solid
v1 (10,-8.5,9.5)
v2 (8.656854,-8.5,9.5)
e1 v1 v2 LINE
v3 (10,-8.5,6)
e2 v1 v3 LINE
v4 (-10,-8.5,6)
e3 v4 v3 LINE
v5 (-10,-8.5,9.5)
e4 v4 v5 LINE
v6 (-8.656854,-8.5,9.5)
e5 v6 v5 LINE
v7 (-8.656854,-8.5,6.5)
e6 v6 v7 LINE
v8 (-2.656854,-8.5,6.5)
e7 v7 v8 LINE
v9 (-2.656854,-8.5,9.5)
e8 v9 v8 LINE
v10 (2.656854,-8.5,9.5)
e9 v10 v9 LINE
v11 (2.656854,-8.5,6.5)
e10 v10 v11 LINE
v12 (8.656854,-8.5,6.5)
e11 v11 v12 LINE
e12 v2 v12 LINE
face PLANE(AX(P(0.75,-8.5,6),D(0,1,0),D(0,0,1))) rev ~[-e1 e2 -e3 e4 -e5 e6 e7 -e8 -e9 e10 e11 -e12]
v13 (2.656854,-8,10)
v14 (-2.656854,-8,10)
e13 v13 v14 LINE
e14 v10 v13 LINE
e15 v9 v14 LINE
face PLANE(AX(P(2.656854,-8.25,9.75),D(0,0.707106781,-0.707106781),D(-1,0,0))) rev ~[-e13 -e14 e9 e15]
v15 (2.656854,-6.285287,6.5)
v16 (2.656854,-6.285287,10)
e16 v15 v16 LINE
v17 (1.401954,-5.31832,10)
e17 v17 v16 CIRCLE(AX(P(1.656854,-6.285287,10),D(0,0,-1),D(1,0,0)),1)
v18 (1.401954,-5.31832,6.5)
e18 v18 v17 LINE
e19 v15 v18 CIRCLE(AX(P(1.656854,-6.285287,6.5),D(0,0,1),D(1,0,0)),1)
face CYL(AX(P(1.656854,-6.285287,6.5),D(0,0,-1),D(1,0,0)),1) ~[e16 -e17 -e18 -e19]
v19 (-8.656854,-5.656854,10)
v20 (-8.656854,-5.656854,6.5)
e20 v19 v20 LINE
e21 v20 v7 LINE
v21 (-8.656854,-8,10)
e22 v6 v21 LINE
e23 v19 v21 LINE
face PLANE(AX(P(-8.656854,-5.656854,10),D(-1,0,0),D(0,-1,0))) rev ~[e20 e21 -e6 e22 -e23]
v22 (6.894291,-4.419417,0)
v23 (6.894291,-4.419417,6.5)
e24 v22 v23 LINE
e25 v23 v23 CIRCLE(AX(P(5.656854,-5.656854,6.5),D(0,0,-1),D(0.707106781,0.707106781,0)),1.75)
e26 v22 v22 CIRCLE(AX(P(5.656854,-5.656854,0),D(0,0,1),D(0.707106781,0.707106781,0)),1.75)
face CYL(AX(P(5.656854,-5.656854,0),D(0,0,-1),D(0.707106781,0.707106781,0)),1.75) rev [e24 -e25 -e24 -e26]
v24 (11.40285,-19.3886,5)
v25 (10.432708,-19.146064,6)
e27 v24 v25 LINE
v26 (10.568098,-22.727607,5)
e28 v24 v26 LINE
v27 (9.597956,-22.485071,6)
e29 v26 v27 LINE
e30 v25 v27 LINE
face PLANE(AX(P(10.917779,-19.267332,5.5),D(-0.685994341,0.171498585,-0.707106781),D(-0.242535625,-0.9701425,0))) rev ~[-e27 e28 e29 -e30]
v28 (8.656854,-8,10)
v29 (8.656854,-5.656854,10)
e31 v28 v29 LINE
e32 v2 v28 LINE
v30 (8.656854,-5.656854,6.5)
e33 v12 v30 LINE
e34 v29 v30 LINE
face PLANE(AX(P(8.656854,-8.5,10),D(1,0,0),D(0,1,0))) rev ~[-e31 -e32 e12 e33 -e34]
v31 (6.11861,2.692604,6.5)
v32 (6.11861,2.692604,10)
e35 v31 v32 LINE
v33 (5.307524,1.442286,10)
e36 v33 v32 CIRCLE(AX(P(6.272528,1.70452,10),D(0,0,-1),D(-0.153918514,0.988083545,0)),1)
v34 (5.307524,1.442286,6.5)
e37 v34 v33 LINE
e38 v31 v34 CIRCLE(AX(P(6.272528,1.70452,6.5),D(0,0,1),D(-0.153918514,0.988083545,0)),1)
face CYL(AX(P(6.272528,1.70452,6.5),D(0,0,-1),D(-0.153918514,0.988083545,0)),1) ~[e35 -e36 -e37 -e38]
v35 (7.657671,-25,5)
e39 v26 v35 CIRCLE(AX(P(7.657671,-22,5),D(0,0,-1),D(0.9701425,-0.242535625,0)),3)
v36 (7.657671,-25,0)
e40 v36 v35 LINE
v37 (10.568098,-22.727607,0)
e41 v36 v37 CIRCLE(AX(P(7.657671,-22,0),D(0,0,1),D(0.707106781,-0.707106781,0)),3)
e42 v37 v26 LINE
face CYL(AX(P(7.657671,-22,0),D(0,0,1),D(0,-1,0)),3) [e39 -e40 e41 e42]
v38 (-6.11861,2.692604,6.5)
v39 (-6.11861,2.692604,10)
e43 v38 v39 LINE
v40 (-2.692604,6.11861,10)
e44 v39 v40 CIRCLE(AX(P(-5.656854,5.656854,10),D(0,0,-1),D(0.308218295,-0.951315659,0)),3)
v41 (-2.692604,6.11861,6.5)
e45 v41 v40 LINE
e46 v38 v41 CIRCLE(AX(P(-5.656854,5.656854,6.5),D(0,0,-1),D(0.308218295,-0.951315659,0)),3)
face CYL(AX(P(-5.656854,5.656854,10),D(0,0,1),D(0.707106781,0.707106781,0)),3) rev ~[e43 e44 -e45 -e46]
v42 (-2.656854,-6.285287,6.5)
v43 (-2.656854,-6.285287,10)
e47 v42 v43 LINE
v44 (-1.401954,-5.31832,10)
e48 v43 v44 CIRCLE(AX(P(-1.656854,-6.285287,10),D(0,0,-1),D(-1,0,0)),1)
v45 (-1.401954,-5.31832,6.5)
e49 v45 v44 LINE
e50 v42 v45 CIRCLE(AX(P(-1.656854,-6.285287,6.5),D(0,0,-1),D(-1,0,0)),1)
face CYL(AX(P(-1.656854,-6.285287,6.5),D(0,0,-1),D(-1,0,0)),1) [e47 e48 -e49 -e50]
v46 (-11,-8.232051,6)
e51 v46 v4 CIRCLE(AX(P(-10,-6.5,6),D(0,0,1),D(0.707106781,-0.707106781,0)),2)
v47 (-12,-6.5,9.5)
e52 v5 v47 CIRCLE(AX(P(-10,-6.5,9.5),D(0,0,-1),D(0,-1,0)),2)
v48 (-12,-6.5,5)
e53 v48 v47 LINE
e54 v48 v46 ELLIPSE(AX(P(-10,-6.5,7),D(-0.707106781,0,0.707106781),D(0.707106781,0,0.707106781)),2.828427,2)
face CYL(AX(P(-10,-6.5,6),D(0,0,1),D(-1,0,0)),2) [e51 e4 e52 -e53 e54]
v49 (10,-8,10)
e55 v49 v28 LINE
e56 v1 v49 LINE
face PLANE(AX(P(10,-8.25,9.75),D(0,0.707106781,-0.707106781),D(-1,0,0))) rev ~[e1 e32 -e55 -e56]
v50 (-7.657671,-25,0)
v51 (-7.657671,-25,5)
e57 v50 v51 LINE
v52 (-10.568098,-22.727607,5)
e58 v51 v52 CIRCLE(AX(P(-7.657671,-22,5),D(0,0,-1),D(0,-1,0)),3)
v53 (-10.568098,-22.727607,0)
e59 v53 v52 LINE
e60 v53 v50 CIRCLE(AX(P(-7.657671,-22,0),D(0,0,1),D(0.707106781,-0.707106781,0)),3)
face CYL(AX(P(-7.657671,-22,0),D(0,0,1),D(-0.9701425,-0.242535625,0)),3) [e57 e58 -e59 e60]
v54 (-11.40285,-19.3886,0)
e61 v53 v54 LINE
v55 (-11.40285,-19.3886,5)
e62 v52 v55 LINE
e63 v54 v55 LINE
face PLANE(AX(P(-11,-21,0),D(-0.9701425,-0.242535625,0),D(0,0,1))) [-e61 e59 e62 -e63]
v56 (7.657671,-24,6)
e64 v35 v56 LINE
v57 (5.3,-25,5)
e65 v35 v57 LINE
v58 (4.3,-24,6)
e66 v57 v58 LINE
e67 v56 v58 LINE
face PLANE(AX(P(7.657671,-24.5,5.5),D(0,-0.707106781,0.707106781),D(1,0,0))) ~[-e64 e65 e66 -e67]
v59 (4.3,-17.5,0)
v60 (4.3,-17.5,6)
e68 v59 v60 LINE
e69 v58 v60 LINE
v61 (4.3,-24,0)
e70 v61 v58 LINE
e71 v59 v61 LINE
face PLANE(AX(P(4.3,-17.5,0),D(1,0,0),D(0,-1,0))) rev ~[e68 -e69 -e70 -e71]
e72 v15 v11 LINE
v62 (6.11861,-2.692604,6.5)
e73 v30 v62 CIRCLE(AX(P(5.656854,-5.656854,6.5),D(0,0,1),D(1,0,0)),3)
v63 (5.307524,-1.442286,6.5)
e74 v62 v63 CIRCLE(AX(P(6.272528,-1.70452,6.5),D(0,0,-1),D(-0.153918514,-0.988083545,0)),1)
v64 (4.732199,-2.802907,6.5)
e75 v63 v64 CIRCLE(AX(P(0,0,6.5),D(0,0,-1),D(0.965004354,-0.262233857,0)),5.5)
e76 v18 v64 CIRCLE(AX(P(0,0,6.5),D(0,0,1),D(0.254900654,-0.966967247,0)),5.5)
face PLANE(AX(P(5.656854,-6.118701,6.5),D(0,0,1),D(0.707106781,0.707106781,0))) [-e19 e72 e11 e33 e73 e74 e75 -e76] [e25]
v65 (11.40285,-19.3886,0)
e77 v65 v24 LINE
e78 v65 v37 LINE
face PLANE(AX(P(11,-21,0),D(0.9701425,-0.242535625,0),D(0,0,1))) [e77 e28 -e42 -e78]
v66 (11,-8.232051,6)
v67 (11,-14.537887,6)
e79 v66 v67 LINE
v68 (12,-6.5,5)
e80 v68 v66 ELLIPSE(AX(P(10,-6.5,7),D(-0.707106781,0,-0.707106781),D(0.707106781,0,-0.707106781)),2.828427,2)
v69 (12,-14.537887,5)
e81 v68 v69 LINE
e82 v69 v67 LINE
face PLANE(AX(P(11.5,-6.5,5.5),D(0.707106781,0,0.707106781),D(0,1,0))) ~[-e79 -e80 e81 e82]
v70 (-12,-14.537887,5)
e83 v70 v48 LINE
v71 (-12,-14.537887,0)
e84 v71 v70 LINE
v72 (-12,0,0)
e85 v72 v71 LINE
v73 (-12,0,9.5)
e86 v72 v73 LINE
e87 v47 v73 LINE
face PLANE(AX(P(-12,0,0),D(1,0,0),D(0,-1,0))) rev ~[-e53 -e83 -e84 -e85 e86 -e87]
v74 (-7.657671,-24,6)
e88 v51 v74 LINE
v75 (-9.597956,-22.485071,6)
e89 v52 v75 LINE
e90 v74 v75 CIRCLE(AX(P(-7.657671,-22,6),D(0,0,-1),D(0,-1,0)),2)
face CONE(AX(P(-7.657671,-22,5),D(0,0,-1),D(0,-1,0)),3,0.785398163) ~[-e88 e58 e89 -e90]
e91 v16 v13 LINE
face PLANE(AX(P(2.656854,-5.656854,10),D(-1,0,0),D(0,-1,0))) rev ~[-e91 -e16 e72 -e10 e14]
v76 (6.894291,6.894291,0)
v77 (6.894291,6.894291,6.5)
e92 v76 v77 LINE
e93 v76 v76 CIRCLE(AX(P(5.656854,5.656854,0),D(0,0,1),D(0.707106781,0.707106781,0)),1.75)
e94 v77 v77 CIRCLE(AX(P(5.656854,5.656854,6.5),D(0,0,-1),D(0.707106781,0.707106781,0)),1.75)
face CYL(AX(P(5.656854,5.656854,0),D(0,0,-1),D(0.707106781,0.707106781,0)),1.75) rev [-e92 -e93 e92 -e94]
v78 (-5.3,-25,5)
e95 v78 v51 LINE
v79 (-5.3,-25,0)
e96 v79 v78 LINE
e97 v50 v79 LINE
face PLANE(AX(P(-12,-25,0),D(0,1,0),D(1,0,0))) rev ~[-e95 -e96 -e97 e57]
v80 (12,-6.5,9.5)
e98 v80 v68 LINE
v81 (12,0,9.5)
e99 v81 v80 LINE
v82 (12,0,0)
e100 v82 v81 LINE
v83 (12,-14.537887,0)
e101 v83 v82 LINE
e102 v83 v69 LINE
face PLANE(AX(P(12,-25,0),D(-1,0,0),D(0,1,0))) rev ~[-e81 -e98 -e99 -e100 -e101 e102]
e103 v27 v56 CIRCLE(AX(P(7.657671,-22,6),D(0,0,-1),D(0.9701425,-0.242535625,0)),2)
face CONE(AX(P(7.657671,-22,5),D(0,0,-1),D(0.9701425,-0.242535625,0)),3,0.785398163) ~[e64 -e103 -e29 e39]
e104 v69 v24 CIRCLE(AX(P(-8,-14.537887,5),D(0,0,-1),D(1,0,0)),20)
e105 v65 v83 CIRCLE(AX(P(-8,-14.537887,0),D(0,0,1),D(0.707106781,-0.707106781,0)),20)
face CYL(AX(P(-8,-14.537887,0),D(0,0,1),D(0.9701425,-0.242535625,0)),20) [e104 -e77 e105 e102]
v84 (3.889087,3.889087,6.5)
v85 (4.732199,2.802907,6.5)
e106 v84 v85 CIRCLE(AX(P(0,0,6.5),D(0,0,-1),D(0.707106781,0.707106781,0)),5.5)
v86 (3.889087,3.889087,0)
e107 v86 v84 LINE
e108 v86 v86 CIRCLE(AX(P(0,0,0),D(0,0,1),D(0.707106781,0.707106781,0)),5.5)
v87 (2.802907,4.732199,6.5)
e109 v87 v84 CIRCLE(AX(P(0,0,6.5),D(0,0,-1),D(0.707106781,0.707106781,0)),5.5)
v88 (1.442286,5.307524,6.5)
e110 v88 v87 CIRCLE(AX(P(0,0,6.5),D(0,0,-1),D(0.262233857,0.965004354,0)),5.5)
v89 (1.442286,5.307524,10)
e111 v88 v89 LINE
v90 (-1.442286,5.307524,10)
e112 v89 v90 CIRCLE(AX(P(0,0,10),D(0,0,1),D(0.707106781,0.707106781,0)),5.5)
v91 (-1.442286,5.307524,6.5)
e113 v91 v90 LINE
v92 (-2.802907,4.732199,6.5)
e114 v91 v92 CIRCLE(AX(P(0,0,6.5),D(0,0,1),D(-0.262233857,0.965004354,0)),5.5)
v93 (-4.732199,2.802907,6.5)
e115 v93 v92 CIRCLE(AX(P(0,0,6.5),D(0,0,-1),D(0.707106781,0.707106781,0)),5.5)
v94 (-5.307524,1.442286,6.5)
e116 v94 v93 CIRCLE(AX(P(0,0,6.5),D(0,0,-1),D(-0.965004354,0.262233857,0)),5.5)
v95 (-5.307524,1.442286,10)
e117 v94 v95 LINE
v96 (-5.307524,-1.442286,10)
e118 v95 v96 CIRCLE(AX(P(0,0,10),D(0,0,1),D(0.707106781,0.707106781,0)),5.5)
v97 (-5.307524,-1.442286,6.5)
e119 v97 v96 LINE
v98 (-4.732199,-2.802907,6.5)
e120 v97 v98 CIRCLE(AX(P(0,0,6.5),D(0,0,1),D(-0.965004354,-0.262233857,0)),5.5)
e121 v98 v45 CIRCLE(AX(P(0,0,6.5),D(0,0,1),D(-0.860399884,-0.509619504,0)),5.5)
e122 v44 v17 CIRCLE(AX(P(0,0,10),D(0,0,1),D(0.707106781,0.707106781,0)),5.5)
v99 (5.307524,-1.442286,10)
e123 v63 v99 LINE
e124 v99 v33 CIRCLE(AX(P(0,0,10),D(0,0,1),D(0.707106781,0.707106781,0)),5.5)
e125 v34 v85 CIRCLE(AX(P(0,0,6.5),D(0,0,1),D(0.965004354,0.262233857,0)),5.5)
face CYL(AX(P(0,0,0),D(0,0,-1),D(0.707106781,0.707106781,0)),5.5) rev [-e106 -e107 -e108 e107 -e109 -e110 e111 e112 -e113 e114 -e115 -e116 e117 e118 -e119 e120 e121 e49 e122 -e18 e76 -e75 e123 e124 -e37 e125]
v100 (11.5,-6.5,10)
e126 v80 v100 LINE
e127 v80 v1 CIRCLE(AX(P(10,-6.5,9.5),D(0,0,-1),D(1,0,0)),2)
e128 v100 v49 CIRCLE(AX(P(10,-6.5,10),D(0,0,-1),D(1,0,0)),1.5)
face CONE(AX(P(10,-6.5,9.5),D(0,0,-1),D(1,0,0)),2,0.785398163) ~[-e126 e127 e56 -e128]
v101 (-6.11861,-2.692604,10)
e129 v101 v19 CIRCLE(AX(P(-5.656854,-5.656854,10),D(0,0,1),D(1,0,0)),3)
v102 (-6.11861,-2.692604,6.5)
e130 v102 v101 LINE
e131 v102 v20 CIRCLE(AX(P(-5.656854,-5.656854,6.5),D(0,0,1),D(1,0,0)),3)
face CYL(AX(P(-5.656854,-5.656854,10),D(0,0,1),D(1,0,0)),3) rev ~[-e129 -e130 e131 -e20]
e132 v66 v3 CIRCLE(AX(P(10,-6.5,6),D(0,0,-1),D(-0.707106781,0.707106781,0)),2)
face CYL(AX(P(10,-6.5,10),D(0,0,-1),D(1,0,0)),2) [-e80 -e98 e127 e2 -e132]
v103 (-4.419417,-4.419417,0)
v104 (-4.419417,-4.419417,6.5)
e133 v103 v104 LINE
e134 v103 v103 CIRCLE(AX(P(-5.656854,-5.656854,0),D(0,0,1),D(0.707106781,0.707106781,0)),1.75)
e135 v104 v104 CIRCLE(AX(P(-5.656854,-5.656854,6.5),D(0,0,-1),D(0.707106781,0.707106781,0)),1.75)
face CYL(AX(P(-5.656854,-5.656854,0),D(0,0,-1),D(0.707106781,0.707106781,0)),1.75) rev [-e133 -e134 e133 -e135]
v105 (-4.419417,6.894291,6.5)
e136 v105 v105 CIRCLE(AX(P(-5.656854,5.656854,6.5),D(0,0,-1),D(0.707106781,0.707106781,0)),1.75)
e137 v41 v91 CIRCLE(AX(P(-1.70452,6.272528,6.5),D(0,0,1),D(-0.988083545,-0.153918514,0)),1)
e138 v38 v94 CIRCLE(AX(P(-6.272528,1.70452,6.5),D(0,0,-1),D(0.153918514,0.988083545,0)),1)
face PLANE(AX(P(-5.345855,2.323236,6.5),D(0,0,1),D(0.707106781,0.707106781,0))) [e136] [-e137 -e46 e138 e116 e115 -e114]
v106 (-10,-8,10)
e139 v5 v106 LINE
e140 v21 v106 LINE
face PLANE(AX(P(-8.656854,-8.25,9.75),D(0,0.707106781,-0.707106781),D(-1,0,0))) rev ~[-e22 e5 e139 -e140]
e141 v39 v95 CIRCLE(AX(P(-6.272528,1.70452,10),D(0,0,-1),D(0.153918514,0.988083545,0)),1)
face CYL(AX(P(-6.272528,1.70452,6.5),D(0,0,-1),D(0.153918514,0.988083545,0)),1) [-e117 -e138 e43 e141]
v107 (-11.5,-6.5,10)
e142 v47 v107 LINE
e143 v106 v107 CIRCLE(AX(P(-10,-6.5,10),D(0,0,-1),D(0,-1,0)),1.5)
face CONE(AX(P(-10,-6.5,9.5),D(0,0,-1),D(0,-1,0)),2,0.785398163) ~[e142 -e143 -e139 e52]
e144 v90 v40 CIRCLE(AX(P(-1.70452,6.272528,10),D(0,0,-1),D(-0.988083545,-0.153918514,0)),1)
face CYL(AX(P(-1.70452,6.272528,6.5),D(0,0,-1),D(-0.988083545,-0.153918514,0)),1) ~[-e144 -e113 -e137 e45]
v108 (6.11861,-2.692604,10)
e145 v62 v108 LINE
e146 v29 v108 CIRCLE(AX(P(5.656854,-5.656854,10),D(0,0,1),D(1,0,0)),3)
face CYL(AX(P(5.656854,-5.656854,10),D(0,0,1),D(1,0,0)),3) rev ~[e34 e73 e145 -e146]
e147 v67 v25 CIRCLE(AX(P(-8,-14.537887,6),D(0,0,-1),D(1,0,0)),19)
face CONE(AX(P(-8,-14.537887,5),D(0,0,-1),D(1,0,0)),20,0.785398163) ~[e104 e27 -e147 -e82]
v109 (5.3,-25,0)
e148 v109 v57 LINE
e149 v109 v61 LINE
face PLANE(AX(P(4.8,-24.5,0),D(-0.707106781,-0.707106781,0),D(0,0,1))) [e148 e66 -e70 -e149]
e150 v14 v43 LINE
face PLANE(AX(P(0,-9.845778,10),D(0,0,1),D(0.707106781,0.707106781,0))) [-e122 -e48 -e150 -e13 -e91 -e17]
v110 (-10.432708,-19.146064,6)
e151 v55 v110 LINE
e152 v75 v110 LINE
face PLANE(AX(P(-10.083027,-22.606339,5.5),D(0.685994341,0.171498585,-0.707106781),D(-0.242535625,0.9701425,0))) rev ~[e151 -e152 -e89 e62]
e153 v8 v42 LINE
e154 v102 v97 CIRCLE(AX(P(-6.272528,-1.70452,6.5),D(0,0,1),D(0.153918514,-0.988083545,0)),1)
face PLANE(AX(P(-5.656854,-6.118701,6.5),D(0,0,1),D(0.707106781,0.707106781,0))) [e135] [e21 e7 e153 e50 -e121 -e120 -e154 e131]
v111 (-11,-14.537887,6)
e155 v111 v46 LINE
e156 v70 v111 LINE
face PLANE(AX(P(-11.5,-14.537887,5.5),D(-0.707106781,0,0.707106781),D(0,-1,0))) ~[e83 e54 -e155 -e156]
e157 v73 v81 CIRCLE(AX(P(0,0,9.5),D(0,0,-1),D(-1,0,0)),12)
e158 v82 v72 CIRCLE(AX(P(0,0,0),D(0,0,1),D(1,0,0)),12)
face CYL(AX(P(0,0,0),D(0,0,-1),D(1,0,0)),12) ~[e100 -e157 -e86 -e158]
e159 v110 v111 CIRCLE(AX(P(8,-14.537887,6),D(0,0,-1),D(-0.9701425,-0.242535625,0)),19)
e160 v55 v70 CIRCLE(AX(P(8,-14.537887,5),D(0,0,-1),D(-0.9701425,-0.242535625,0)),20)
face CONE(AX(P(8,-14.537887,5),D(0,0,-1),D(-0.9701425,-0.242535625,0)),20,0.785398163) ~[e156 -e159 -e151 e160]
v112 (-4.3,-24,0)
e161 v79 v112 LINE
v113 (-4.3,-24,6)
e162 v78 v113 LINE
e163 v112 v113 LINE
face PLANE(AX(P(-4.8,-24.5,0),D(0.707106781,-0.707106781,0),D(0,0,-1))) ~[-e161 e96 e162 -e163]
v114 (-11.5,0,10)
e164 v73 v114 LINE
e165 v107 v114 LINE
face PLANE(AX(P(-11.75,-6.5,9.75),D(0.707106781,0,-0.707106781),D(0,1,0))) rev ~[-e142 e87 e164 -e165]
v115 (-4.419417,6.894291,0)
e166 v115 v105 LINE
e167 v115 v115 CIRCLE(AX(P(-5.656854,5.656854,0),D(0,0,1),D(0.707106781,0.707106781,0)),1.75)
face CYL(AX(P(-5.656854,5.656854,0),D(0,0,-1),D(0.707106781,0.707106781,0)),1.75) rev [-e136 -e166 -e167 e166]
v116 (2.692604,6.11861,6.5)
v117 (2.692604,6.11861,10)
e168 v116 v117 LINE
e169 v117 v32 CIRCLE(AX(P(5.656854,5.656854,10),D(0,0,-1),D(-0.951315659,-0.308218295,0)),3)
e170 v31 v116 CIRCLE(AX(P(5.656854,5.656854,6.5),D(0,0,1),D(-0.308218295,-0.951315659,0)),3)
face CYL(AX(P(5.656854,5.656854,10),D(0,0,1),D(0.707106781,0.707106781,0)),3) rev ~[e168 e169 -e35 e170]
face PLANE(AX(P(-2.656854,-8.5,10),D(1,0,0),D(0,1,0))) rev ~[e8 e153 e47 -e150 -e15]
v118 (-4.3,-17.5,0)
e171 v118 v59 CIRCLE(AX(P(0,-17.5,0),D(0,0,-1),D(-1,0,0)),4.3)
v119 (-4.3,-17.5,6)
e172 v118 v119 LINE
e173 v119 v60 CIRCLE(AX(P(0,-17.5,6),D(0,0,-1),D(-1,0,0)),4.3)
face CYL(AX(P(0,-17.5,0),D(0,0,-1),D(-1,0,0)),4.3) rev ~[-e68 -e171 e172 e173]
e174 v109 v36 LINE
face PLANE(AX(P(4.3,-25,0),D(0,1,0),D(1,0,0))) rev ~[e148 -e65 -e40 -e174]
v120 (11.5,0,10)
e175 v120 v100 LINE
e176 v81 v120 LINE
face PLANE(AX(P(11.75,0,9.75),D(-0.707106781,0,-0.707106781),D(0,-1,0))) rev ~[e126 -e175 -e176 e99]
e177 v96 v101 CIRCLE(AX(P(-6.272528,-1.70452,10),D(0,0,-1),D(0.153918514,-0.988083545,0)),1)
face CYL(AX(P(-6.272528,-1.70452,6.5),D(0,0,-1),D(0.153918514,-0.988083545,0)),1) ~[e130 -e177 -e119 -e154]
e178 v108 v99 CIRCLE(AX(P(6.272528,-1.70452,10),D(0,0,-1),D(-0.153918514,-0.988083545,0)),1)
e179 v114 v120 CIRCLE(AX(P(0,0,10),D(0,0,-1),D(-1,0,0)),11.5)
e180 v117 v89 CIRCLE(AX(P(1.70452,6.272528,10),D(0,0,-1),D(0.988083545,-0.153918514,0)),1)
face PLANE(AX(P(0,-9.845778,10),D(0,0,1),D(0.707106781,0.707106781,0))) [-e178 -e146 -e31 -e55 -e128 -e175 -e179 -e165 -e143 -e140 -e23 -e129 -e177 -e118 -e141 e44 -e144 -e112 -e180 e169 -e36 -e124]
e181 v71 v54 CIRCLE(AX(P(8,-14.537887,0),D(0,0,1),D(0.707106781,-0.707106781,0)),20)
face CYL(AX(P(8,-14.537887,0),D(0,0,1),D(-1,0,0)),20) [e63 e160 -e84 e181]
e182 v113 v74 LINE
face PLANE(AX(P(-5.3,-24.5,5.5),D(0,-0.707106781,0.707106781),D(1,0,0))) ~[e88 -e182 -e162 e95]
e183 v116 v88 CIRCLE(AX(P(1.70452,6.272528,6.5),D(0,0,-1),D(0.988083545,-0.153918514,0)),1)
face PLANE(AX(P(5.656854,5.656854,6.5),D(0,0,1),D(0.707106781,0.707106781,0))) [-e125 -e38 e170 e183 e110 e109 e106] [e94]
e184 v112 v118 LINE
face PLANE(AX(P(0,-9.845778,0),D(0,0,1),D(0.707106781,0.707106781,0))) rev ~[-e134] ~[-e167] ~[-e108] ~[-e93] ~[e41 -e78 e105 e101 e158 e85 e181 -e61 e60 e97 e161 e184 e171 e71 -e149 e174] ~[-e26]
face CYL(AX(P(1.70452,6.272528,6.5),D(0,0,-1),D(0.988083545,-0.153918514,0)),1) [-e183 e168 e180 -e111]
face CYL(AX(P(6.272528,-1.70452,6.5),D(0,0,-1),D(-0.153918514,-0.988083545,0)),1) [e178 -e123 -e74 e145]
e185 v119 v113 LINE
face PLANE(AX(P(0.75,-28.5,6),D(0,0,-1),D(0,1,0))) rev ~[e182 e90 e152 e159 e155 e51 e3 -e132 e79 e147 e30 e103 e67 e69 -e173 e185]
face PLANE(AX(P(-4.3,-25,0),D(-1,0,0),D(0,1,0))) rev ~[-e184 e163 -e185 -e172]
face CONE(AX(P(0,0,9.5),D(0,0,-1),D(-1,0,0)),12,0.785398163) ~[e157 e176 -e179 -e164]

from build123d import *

# Parameters (mm, degrees)
F0_R        = 1.75
F0_R_2      = 5.5
F1_DEPTH    = 10
F2_SIZE2    = 8
F2_SIZE     = 2
F3_SIZE2    = 2
F3_SIZE     = 8
F5_W        = 20
F5_H        = 8
F6_DEPTH    = 15
F7_R        = 3
F8_DEPTH    = 3.5
F9_T1_DEPTH = 7.3998501729
F9_T3_DEPTH = 7.1931423334
F10_R       = 2
F11_SIZE    = 0.5
F12_SIZE    = 1
F13_R       = 3
F14_R       = 20
F15_SIZE    = 1
F17_ANGLE   = 45


# Not quite as in the source:
# - a fillet or chamfer that OpenCascade refuses, or shapes differently, is made with other operations: its cross-section is extruded or revolved along the edge and cut away or added


with BuildPart() as f1:
    # F0 (on Top) → F1 (new body)
    with BuildSketch(Plane.XY):
        with BuildLine():
            Line((-9.1923881554, -26.1629509039), (8.4852813742, -8.4852813742))
            ThreePointArc((8.4852813742, -8.4852813742), (8.4852813742, 8.4852813742), (-8.4852813742, 8.4852813742))
            Line((-8.4852813742, 8.4852813742), (-26.1629509039, -9.1923881554))
            Line((-26.1629509039, -9.1923881554), (-20.7182286888, -14.6371103706))
            Line((-20.7182286888, -14.6371103706), (-15.4149278299, -9.3338095117))
            ThreePointArc((-15.4149278299, -9.3338095117), (-9.3338095117, -9.3338095117), (-9.3338095117, -15.4149278299))
            Line((-9.3338095117, -15.4149278299), (-14.6371103706, -20.7182286888))
            Line((-14.6371103706, -20.7182286888), (-9.1923881554, -26.1629509039))
        make_face()
        with Locations((0, -8)):
            Circle(F0_R, mode=Mode.SUBTRACT)
        with Locations((-8, 0)):
            Circle(F0_R, mode=Mode.SUBTRACT)
        Circle(F0_R_2, mode=Mode.SUBTRACT)
        with Locations((8, 0)):
            Circle(F0_R, mode=Mode.SUBTRACT)
        with Locations((0, 8)):
            Circle(F0_R, mode=Mode.SUBTRACT)
    extrude(amount=F1_DEPTH)

    # F2
    f2_edges = [f1.edges().sort_by_distance(p)[0] for p in [
        (-26.162951, -9.192388, 5),
    ]]
    f2_side = f1.faces().sort_by_distance((-23.44059, -11.914749, 5))[0]
    chamfer(f2_edges, length=F2_SIZE, length2=F2_SIZE2, reference=f2_side)

    # F3
    f3_edges = [f1.edges().sort_by_distance(p)[0] for p in [
        (-9.192388, -26.162951, 5),
    ]]
    f3_side = f1.faces().sort_by_distance((-0.353553, -17.324116, 5))[0]
    chamfer(f3_edges, length=F3_SIZE, length2=F3_SIZE2, reference=f3_side)

    # F5 (on offset) → F6 (cut, symmetric)
    with BuildSketch(Plane(origin=(0.5303300859, -0.5303300859, 0), x_dir=(0.7071067812, 0.7071067812, 0), z_dir=(0.7071067812, -0.7071067812, 0))):
        with Locations((-18.5, 10)):
            Rectangle(F5_W, F5_H)
    extrude(amount=F6_DEPTH, both=True, mode=Mode.SUBTRACT)

    # F7 (on face) → F8 (cut)
    with BuildSketch(Plane.XY.offset(10)):
        with BuildLine():
            Line((-7.8890872965, -4.1317279836), (-5.8786796564, -2.1213203436))
            ThreePointArc((-5.8786796564, -2.1213203436), (-5.8786796564, 2.1213203436), (-10.1213203436, 2.1213203436))
            Line((-10.1213203436, 2.1213203436), (-12.1317279836, 0.1109127035))
            Line((-12.1317279836, 0.1109127035), (-7.8890872965, -4.1317279836))
        make_face()
        with BuildLine():
            Line((0.1109127035, -12.1317279836), (2.1213203436, -10.1213203436))
            ThreePointArc((2.1213203436, -10.1213203436), (2.1213203436, -5.8786796564), (-2.1213203436, -5.8786796564))
            Line((-2.1213203436, -5.8786796564), (-4.1317279836, -7.8890872965))
            Line((-4.1317279836, -7.8890872965), (0.1109127035, -12.1317279836))
        make_face()
        with Locations((8, 0)):
            Circle(F7_R)
        with Locations((0, 8)):
            Circle(F7_R)
    extrude(amount=-F8_DEPTH, mode=Mode.SUBTRACT)

    # F9: fillet of radius 1 on 8 edges, made by hand

    # F9_s2 → F9_t1 (cut)
    with BuildSketch(Plane.XY.offset(6.5)):
        with BuildLine():
            ThreePointArc((-6.3230487903, -2.5656894774), (-5.4874259536, -2.2810888302), (-4.7519509308, -2.7692891419))
            Line((-4.7519509308, -2.7692891419), (-4.665551823, -2.7189384302))
            ThreePointArc((-4.665551823, -2.7189384302), (-4.9962431034, -2.0487935111), (-5.23125, -1.3394116012))
            Line((-5.23125, -1.3394116012), (-5.4171875, -1.3187416691))
            ThreePointArc((-5.4171875, -1.3187416691), (-5.9493903346, -2.0506096654), (-6.3937594684, -2.4949787993))
            Line((-6.3937594684, -2.4949787993), (-6.3230487903, -2.5656894774))
        make_face()
        with BuildLine():
            ThreePointArc((-2.5656894774, -6.3230487903), (-2.2810888302, -5.4874259536), (-2.7692891419, -4.7519509308))
            Line((-2.7692891419, -4.7519509308), (-2.7189384302, -4.665551823))
            ThreePointArc((-2.7189384302, -4.665551823), (-2.0487935111, -4.9962431034), (-1.3394116012, -5.23125))
            Line((-1.3394116012, -5.23125), (-1.3187416691, -5.4171875))
            ThreePointArc((-1.3187416691, -5.4171875), (-2.0506096654, -5.9493903346), (-2.4949787993, -6.3937594684))
            Line((-2.4949787993, -6.3937594684), (-2.5656894774, -6.3230487903))
        make_face()
    extrude(amount=F9_T1_DEPTH, mode=Mode.SUBTRACT)

    # F9_s4 → F9_t3 (cut)
    with BuildSketch(Plane.XY.offset(6.5)):
        with BuildLine():
            ThreePointArc((-6.23046875, 2.4225521987), (-5.4322290759, 2.2520250497), (-4.7728365385, 2.7331358139))
            ThreePointArc((-4.7728365385, 2.7331358139), (-5.0966500462, 2.06740376), (-5.328125, 1.3642155198))
            ThreePointArc((-5.328125, 1.3642155198), (-5.717119911, 1.9463962852), (-6.23046875, 2.4225521987))
        make_face()
        with BuildLine():
            ThreePointArc((2.4225521987, -6.23046875), (2.2520250497, -5.4322290759), (2.7331358139, -4.7728365385))
            ThreePointArc((2.7331358139, -4.7728365385), (2.06740376, -5.0966500462), (1.3642155198, -5.328125))
            ThreePointArc((1.3642155198, -5.328125), (1.9463962852, -5.717119911), (2.4225521987, -6.23046875))
        make_face()
        with BuildLine():
            ThreePointArc((6.23046875, -2.4225521987), (5.4322290759, -2.2520250497), (4.7728365385, -2.7331358139))
            ThreePointArc((4.7728365385, -2.7331358139), (5.0966500462, -2.06740376), (5.328125, -1.3642155198))
            ThreePointArc((5.328125, -1.3642155198), (5.717119911, -1.9463962852), (6.23046875, -2.4225521987))
        make_face()
        with BuildLine():
            ThreePointArc((6.23046875, 2.4225521987), (5.4322290759, 2.2520250497), (4.7728365385, 2.7331358139))
            ThreePointArc((4.7728365385, 2.7331358139), (5.0966500462, 2.06740376), (5.328125, 1.3642155198))
            ThreePointArc((5.328125, 1.3642155198), (5.717119911, 1.9463962852), (6.23046875, 2.4225521987))
        make_face()
        with BuildLine():
            ThreePointArc((-2.4225521987, 6.23046875), (-2.2520250497, 5.4322290759), (-2.7331358139, 4.7728365385))
            ThreePointArc((-2.7331358139, 4.7728365385), (-2.06740376, 5.0966500462), (-1.3642155198, 5.328125))
            ThreePointArc((-1.3642155198, 5.328125), (-1.9463962852, 5.717119911), (-2.4225521987, 6.23046875))
        make_face()
        with BuildLine():
            ThreePointArc((2.4225521987, 6.23046875), (2.2520250497, 5.4322290759), (2.7331358139, 4.7728365385))
            ThreePointArc((2.7331358139, 4.7728365385), (2.06740376, 5.0966500462), (1.3642155198, 5.328125))
            ThreePointArc((1.3642155198, 5.328125), (1.9463962852, 5.717119911), (2.4225521987, 6.23046875))
        make_face()
    extrude(amount=F9_T3_DEPTH, mode=Mode.SUBTRACT)

    # F10
    f10_edges = [f1.edges().sort_by_distance(p)[0] for p in [
        (2.474874, -14.495689, 8),
        (-14.495689, 2.474874, 8),
    ]]
    fillet(f10_edges, radius=F10_R)

    # F11
    f11_edges = [f1.edges().sort_by_distance(p)[0] for p in [
        (0.585786, -12.606602, 10),
        (-12.606602, 0.585786, 10),
        (-6.010408, -6.010408, 10),
        (2.474874, -13.667262, 10),
        (-13.667262, 2.474874, 10),
        (6.187184, -10.783378, 10),
        (8.485281, 8.485281, 10),
        (-10.783378, 6.187184, 10),
    ]]
    chamfer(f11_edges, length=F11_SIZE)

    # F12
    f12_edges = [f1.edges().sort_by_distance(p)[0] for p in [
        (-20.718229, -14.63711, 3),
        (-14.63711, -20.718229, 3),
    ]]
    chamfer(f12_edges, length=F12_SIZE)

    # F13
    f13_edges = [f1.edges().sort_by_distance(p)[0] for p in [
        (-10.606602, -24.748737, 3),
        (-24.748737, -10.606602, 3),
    ]]
    fillet(f13_edges, radius=F13_R)

    # F14
    f14_edges = [f1.edges().sort_by_distance(p)[0] for p in [
        (-3.535534, -20.506097, 3),
        (-20.506097, -3.535534, 3),
    ]]
    fillet(f14_edges, radius=F14_R)

    # F15
    f15_edges = [f1.edges().sort_by_distance(p)[0] for p in [
        (-13.096441, -22.258898, 6),
        (-10.508108, -23.948663, 6),
        (-7.122424, -22.658231, 6),
        (-3.628449, -20.387093, 6),
        (0.340158, -16.630405, 6),
        (-22.258898, -13.096441, 6),
        (-23.948663, -10.508108, 6),
        (-22.658231, -7.122424, 6),
    ]]
    chamfer(f15_edges, length=F15_SIZE)


with BuildPart() as f1_1:
    # F17: moved
    add(f1.part.rotate(Axis((0, 0, 12.5), (0, 0, 1)), F17_ANGLE))


solid = f1_1.part
